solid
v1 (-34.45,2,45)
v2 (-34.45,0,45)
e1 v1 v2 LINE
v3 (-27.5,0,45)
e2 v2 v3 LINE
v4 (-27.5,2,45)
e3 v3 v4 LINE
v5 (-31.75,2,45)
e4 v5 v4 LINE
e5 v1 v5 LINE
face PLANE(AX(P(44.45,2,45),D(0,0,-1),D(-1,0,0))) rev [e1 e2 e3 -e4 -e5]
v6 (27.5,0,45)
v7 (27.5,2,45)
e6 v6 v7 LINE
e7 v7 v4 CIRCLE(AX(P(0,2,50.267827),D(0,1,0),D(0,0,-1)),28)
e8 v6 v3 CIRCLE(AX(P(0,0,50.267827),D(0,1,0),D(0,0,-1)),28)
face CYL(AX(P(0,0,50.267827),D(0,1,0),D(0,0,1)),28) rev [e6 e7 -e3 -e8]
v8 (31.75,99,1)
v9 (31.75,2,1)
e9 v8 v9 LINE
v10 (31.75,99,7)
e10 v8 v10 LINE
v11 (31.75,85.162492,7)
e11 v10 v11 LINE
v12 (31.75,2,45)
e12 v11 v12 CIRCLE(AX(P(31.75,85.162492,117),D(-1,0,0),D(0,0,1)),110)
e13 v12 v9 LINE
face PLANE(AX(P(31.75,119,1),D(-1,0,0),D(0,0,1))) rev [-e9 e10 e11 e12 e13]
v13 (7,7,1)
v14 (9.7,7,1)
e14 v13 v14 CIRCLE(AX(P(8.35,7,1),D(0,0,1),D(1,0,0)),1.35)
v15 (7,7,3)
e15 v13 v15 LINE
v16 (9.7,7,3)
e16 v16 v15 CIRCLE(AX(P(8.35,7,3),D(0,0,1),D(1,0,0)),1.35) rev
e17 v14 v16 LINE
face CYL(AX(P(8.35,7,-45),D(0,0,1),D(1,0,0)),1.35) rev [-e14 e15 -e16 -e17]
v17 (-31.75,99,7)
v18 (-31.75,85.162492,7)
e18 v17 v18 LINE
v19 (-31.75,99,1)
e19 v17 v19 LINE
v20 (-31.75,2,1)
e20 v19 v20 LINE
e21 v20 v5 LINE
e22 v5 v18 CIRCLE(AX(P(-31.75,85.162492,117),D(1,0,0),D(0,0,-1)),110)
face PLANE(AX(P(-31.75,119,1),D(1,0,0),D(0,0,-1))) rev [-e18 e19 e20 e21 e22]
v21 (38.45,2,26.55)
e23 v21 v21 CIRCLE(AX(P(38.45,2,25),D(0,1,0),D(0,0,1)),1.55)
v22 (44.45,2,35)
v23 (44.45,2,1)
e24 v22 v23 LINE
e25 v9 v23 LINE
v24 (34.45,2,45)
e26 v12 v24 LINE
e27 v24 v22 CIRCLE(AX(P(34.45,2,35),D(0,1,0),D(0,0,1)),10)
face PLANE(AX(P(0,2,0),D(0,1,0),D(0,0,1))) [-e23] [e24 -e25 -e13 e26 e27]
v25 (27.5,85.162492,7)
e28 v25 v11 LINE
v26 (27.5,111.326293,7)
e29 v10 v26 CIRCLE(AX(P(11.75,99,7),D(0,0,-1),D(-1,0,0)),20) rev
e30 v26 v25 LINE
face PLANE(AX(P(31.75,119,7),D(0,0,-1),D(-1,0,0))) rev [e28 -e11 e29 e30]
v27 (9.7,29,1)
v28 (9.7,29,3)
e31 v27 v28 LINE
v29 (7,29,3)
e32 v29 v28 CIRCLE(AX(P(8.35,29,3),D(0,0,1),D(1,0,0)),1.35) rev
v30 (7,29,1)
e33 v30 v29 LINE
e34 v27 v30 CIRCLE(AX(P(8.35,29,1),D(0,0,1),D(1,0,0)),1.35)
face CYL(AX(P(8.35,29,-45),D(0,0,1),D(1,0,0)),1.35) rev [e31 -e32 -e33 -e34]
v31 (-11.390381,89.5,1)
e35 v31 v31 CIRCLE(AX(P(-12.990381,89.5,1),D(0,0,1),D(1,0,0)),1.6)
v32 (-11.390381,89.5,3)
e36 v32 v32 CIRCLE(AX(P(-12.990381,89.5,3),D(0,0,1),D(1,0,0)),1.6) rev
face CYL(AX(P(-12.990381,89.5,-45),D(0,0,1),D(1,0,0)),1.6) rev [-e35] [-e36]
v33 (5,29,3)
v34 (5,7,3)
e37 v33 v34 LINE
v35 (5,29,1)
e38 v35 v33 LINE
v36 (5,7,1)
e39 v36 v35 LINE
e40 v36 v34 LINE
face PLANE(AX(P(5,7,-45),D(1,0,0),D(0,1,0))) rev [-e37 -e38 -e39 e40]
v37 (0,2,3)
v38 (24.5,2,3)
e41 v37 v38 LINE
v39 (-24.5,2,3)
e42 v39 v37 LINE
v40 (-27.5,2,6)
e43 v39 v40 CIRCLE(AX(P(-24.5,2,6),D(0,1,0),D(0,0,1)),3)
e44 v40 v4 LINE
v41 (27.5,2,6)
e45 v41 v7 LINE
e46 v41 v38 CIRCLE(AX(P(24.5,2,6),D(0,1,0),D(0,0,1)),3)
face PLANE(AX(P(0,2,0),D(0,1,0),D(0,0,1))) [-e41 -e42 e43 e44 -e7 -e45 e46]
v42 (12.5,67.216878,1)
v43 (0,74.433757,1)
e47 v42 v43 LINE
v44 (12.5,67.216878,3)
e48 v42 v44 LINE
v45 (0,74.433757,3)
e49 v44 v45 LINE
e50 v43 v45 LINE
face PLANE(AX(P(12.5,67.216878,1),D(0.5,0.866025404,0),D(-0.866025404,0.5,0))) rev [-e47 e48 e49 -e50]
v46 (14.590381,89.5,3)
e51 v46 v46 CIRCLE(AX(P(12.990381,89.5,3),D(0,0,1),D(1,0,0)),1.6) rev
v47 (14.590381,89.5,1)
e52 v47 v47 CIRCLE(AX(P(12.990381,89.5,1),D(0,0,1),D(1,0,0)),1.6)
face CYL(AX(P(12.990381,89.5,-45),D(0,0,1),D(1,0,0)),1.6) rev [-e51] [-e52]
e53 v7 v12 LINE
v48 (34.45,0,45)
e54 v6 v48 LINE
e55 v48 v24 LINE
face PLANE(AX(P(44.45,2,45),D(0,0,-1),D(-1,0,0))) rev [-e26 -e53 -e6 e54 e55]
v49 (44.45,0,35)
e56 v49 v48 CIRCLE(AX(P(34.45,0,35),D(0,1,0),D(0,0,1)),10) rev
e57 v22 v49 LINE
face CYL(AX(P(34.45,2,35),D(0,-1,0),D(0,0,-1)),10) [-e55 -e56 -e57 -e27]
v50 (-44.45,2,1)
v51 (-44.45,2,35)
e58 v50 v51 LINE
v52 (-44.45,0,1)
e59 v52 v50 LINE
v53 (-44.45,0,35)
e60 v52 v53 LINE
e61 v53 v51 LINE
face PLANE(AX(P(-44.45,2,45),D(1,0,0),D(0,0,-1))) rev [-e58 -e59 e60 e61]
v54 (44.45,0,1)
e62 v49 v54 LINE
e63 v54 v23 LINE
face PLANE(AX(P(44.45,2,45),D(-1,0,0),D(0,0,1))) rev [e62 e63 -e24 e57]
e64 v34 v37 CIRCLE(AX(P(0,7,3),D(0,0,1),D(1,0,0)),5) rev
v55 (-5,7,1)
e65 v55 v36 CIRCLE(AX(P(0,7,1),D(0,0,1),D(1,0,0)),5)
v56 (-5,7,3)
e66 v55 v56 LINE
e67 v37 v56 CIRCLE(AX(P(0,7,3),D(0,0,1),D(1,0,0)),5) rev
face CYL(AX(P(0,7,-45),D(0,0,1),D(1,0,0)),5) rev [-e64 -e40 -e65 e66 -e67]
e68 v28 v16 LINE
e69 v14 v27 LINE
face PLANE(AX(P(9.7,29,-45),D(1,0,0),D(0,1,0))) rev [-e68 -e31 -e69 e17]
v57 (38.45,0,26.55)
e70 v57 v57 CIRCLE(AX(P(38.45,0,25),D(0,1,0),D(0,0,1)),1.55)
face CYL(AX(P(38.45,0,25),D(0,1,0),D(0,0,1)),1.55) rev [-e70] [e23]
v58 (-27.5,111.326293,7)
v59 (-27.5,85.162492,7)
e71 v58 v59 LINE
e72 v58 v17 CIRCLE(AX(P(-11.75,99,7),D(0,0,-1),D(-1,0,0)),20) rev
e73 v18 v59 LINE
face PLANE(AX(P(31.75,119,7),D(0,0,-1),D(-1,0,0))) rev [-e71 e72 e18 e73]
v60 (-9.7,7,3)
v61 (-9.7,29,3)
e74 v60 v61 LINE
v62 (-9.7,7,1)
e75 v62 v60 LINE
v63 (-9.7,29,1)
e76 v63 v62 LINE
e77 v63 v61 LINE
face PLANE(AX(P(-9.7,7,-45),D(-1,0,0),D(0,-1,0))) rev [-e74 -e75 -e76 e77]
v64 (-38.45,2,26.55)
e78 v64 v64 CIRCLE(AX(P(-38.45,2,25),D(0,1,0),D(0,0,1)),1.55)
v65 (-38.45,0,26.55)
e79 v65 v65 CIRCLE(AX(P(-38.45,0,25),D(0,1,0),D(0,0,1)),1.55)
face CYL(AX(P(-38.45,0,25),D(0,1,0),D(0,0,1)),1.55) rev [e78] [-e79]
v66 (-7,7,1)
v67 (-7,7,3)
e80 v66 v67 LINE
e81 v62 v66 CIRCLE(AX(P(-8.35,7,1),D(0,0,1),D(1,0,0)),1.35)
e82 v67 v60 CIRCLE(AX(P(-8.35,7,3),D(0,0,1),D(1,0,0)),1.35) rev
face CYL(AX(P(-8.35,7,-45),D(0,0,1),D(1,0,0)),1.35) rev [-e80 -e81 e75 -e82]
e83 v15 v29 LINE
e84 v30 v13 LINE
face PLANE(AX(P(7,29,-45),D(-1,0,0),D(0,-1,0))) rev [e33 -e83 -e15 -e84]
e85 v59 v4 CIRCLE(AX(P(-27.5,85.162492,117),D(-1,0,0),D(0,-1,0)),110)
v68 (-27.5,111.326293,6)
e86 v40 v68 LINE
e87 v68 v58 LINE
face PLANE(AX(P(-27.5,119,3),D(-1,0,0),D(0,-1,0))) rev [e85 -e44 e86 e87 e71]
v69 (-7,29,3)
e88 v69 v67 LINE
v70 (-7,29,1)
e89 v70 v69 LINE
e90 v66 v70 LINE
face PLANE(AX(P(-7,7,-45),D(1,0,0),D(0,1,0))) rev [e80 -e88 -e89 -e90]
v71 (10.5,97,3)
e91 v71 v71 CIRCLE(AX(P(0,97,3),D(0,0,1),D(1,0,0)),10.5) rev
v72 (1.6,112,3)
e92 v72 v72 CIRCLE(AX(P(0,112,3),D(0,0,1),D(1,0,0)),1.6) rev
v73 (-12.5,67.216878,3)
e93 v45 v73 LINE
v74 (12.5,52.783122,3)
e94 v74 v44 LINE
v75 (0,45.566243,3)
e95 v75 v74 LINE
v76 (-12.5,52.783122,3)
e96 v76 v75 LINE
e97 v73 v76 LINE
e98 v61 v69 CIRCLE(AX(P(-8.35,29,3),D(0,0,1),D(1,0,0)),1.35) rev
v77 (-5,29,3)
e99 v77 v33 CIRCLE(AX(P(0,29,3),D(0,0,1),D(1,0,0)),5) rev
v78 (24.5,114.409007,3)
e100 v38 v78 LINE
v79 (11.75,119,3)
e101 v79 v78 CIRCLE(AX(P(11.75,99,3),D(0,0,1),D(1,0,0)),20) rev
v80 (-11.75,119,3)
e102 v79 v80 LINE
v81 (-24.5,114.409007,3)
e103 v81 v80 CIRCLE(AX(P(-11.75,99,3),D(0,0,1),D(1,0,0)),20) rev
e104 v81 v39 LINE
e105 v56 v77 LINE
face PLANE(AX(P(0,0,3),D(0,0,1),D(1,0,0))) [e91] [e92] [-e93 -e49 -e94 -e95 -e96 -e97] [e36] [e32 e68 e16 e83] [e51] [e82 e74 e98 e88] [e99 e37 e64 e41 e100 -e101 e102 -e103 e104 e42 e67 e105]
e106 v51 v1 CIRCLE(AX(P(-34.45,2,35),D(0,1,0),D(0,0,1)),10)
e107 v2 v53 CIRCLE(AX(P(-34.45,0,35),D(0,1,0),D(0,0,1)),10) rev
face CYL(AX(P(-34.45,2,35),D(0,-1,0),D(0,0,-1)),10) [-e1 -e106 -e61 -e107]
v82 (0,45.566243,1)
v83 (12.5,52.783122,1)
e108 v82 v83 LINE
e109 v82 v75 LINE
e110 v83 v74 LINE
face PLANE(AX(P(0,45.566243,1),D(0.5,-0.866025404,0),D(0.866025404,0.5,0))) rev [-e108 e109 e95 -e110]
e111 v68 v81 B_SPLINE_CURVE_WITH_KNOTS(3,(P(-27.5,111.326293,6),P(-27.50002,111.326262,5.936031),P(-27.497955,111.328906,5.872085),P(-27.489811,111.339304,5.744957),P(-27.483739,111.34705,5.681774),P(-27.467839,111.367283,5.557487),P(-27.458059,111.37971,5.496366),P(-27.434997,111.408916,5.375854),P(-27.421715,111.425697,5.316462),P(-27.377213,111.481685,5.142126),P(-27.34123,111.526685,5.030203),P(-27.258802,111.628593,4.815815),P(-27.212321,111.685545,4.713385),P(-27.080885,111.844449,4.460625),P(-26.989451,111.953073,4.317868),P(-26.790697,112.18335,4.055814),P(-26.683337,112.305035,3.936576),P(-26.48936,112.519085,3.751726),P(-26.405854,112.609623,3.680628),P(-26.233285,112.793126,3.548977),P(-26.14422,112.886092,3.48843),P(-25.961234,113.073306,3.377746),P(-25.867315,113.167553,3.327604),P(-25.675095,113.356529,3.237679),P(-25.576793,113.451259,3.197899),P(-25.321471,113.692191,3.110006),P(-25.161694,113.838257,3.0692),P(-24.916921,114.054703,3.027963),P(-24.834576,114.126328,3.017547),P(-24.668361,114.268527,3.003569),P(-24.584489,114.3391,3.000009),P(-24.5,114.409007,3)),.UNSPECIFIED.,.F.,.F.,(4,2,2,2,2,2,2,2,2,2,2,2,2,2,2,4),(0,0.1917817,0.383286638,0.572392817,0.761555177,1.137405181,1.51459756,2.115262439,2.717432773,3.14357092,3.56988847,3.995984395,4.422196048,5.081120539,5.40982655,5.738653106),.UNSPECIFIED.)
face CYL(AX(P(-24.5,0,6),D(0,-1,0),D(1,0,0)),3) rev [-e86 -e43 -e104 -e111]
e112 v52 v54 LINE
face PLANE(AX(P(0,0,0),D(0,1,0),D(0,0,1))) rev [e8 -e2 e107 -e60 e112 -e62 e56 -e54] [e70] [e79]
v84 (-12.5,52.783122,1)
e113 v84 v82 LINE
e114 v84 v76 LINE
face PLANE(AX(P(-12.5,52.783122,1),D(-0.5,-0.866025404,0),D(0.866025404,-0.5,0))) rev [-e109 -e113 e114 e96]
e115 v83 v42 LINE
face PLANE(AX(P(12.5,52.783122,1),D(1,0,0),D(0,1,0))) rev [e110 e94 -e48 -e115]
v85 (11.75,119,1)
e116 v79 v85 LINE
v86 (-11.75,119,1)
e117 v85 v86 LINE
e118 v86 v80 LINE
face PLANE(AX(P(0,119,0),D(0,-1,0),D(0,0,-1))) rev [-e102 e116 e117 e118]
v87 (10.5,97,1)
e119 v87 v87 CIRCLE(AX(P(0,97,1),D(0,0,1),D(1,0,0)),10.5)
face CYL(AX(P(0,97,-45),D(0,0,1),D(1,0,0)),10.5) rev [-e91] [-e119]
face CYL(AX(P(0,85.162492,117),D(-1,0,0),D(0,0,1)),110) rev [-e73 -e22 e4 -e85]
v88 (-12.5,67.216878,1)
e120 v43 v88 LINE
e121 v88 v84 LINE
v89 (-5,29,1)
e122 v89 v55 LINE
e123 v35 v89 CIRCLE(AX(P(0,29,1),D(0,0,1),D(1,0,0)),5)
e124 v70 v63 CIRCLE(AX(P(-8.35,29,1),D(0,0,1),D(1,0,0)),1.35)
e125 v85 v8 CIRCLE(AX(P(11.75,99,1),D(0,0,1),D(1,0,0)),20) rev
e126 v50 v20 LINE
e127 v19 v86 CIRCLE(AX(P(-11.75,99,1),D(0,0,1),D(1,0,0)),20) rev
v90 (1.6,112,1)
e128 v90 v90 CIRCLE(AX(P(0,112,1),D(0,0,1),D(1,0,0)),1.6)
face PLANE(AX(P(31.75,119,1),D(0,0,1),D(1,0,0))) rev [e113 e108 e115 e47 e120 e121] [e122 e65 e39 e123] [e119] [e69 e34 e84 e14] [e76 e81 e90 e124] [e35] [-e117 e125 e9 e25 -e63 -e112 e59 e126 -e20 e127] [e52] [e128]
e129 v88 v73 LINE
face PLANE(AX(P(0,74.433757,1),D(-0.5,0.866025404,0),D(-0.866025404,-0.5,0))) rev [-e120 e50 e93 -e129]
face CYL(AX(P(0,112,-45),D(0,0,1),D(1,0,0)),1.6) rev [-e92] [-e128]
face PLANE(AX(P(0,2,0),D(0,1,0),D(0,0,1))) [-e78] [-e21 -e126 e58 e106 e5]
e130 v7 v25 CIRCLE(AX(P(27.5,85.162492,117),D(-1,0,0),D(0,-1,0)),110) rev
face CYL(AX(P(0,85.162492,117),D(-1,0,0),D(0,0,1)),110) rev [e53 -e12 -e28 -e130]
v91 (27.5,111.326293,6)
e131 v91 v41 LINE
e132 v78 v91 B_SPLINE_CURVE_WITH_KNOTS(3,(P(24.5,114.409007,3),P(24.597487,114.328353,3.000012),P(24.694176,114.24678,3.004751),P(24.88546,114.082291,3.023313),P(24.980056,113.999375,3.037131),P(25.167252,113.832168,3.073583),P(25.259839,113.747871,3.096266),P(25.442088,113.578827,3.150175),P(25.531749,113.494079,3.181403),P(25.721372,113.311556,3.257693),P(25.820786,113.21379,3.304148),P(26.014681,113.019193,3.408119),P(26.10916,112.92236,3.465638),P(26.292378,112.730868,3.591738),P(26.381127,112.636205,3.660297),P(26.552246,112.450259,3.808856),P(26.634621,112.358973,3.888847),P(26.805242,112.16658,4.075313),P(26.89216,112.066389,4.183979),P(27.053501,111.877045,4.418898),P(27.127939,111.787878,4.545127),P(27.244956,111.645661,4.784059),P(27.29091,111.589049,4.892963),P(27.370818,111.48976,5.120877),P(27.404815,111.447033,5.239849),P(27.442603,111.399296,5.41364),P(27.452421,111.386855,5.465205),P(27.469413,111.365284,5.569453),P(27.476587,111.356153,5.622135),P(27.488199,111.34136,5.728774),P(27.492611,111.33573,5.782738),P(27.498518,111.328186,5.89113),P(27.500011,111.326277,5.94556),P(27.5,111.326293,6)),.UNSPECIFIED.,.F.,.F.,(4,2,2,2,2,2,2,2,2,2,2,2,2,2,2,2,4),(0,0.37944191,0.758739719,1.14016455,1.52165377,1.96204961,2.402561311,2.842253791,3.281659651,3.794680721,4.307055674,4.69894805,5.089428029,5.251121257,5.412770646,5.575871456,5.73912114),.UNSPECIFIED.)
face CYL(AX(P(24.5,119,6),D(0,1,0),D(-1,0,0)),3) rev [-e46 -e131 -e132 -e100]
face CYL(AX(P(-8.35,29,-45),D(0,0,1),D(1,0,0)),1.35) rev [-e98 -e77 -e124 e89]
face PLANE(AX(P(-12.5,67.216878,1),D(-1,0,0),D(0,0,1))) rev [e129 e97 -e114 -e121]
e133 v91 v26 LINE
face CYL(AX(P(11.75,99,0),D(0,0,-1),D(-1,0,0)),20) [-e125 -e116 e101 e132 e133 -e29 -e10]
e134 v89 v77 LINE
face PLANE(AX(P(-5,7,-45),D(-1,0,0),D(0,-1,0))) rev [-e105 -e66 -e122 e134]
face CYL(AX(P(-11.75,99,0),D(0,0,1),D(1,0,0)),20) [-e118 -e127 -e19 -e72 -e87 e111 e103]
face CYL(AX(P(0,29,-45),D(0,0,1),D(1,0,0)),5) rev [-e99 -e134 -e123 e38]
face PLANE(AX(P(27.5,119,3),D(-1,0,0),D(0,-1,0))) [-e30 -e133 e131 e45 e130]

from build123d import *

# Parameters (mm, degrees)
SKETCH1_W           = 88.9
SKETCH1_H           = 90
BASE_DEPTH          = 2
SKETCH2_W           = 63.5
SKETCH2_H           = 6
FACE_PLATE_DEPTH    = 117
SKETCH5_R           = 10.5
SKETCH5_R_2         = 1.6
FACE_HOLES_DEPTH    = 138.261802771
FILLET2_R           = 10
FILLET3_R           = 20
SKETCH23_W          = 55
SKETCH23_H          = 117
CUT_EXTRUDE6_DEPTH  = 4
FILLET4_R           = 110
SKETCH24_W          = 88.9
SKETCH24_H          = 46
CUT_EXTRUDE7_DEPTH  = 3
SKETCH25_R          = 1.55
CUT_EXTRUDE8_DEPTH  = 134.003016883
CUT_EXTRUDE9_DEPTH  = 134.003016883
FILLET5_R           = 3
CUT_EXTRUDE10_DEPTH = 134.793880741


with BuildPart() as part:
    # Sketch1 → Base (new body)
    with BuildSketch(Plane(origin=(0, 0, 0), x_dir=(1, 0, 0), z_dir=(0, 1, 0))):
        Rectangle(SKETCH1_W, SKETCH1_H)
    extrude(amount=BASE_DEPTH)

    # Sketch2 → Face Plate (add)
    with BuildSketch(Plane(origin=(0, 2, 0), x_dir=(1, 0, 0), z_dir=(0, 1, 0))):
        with Locations((0, -4)):
            Rectangle(SKETCH2_W, SKETCH2_H)
    extrude(amount=FACE_PLATE_DEPTH)

    # Sketch5 → Face Holes (cut, through all)
    with BuildSketch(Plane.XY.offset(7)):
        with Locations((0, 97)):
            Circle(SKETCH5_R)
        with Locations((12.990381057, 89.5)):
            Circle(SKETCH5_R_2)
        with Locations((-12.990381057, 89.5)):
            Circle(SKETCH5_R_2)
        with Locations((0, 112)):
            Circle(SKETCH5_R_2)
        with BuildLine():
            Line((-9.7, 7), (-9.7, 29))
            ThreePointArc((-9.7, 29), (-8.35, 30.35), (-7, 29))
            Line((-7, 29), (-7, 7))
            ThreePointArc((-7, 7), (-8.35, 5.65), (-9.7, 7))
        make_face()
        with BuildLine():
            Line((9.7, 29), (9.7, 7))
            ThreePointArc((9.7, 7), (8.35, 5.65), (7, 7))
            Line((7, 7), (7, 29))
            ThreePointArc((7, 29), (8.35, 30.35), (9.7, 29))
        make_face()
        with BuildLine():
            Line((-5, 7), (-5, 29))
            ThreePointArc((-5, 29), (0, 34), (5, 29))
            Line((5, 29), (5, 7))
            ThreePointArc((5, 7), (0, 2), (-5, 7))
        make_face()
    extrude(amount=-FACE_HOLES_DEPTH, mode=Mode.SUBTRACT)

    # Fillet2
    fillet2_edges = [part.edges().sort_by_distance(p)[0] for p in [
        (-44.45, 1, -45),
        (44.45, 1, -45),
        (44.45, 1, 45),
        (-44.45, 1, 45),
    ]]
    fillet(fillet2_edges, radius=FILLET2_R)

    # Fillet3
    fillet3_edges = [part.edges().sort_by_distance(p)[0] for p in [
        (-31.75, 119, 4),
        (31.75, 119, 4),
    ]]
    fillet(fillet3_edges, radius=FILLET3_R)

    # Sketch23 → Cut-Extrude6 (cut)
    with BuildSketch(Plane.XY.offset(7)):
        with Locations((0, 60.5)):
            Rectangle(SKETCH23_W, SKETCH23_H)
    extrude(amount=-CUT_EXTRUDE6_DEPTH, mode=Mode.SUBTRACT)

    # Fillet4
    # the kernel refuses this fillet: 110 mm, written as the material it adds along each edge
    with BuildSketch(Plane(origin=(-180.406228863, 2, 7), x_dir=(0, 0, 1), z_dir=(1, 0, 0))) as fillet4_piece_1_section:
        with BuildLine():
            CenterArc((110, -83.162491545), FILLET4_R, 130.885192893, 49.114807107)
            Line((0, -83.162491545), (0, 0))
            Line((0, 0), (38, 0))
        make_face()
    fillet4_piece_1 = extrude(amount=420.062457726, mode=Mode.PRIVATE)
    fillet4_piece_1 = split(fillet4_piece_1, bisect_by=Plane(origin=(-31.75, 51.263709825, 12.122352248), z_dir=(1, 0, 0)), keep=Keep.TOP, mode=Mode.PRIVATE)
    fillet4_piece_1 = split(fillet4_piece_1, bisect_by=Plane(origin=(-27.5, 51.263709825, 12.122352248), z_dir=(-1, 0, 0)), keep=Keep.TOP, mode=Mode.PRIVATE)
    add(fillet4_piece_1)
    with BuildSketch(Plane(origin=(27.5, 2, 7), x_dir=(0, 0, 1), z_dir=(1, 0, 0)), Plane(origin=(-31.75, 2, 7), x_dir=(0, 0, 1), z_dir=(1, 0, 0))) as fillet4_piece_2:
        with BuildLine():
            CenterArc((110, -83.162491545), FILLET4_R, 130.885192893, 49.114807107)
            Line((0, -83.162491545), (0, 0))
            Line((0, 0), (38, 0))
        make_face()
    extrude(amount=4.25)
    with BuildSketch(Plane(origin=(-239.656228863, 2, 7), x_dir=(0, 0, 1), z_dir=(1, 0, 0))) as fillet4_piece_3_section:
        with BuildLine():
            CenterArc((110, -83.162491545), FILLET4_R, 130.885192893, 49.114807107)
            Line((0, -83.162491545), (0, 0))
            Line((0, 0), (38, 0))
        make_face()
    fillet4_piece_3 = extrude(amount=420.062457726, mode=Mode.PRIVATE)
    fillet4_piece_3 = split(fillet4_piece_3, bisect_by=Plane(origin=(31.75, 51.263709825, 12.122352248), z_dir=(-1, 0, 0)), keep=Keep.TOP, mode=Mode.PRIVATE)
    fillet4_piece_3 = split(fillet4_piece_3, bisect_by=Plane(origin=(27.5, 51.263709825, 12.122352248), z_dir=(1, 0, 0)), keep=Keep.TOP, mode=Mode.PRIVATE)
    add(fillet4_piece_3)

    # Sketch24 → Cut-Extrude7 (cut)
    with BuildSketch(Plane(origin=(0, 2, 0), x_dir=(1, 0, 0), z_dir=(0, 1, 0))):
        with Locations((0, 22)):
            Rectangle(SKETCH24_W, SKETCH24_H)
    extrude(amount=-CUT_EXTRUDE7_DEPTH, mode=Mode.SUBTRACT)

    # Sketch25 → Cut-Extrude8 (cut, through all)
    with BuildSketch(Plane(origin=(0, 2, 0), x_dir=(1, 0, 0), z_dir=(0, 1, 0))):
        with Locations(Location((38.45, -25, 0), (0, 0, 270))):
            Circle(SKETCH25_R)
        with Locations(Location((-38.45, -25, 0), (0, 0, 270))):
            Circle(SKETCH25_R)
    extrude(amount=-CUT_EXTRUDE8_DEPTH, mode=Mode.SUBTRACT)

    # Sketch26 → Cut-Extrude9 (cut, through all)
    with BuildSketch(Plane(origin=(0, 2, 0), x_dir=(1, 0, 0), z_dir=(0, 1, 0))):
        with BuildLine():
            Line((-27.5, -45), (27.5, -45))
            ThreePointArc((27.5, -45), (0, -22.267826876), (-27.5, -45))
        make_face()
    extrude(amount=-CUT_EXTRUDE9_DEPTH, mode=Mode.SUBTRACT)

    # Fillet5
    fillet5_edges = [part.edges().sort_by_distance(p)[0] for p in [
        (27.5, 56.663146518, 3),
        (-27.5, 56.663146518, 3),
    ]]
    fillet(fillet5_edges, radius=FILLET5_R)

    # Sketch27 → Cut-Extrude10 (cut, through all)
    with BuildSketch(Plane.XY.offset(3)):
        Polygon((0, 45.56624327), (12.5, 52.783121635), (12.5, 67.216878365), (0, 74.43375673), (-12.5, 67.216878365), (-12.5, 52.783121635), align=None)
    extrude(amount=-CUT_EXTRUDE10_DEPTH, mode=Mode.SUBTRACT)


solid = part.part
